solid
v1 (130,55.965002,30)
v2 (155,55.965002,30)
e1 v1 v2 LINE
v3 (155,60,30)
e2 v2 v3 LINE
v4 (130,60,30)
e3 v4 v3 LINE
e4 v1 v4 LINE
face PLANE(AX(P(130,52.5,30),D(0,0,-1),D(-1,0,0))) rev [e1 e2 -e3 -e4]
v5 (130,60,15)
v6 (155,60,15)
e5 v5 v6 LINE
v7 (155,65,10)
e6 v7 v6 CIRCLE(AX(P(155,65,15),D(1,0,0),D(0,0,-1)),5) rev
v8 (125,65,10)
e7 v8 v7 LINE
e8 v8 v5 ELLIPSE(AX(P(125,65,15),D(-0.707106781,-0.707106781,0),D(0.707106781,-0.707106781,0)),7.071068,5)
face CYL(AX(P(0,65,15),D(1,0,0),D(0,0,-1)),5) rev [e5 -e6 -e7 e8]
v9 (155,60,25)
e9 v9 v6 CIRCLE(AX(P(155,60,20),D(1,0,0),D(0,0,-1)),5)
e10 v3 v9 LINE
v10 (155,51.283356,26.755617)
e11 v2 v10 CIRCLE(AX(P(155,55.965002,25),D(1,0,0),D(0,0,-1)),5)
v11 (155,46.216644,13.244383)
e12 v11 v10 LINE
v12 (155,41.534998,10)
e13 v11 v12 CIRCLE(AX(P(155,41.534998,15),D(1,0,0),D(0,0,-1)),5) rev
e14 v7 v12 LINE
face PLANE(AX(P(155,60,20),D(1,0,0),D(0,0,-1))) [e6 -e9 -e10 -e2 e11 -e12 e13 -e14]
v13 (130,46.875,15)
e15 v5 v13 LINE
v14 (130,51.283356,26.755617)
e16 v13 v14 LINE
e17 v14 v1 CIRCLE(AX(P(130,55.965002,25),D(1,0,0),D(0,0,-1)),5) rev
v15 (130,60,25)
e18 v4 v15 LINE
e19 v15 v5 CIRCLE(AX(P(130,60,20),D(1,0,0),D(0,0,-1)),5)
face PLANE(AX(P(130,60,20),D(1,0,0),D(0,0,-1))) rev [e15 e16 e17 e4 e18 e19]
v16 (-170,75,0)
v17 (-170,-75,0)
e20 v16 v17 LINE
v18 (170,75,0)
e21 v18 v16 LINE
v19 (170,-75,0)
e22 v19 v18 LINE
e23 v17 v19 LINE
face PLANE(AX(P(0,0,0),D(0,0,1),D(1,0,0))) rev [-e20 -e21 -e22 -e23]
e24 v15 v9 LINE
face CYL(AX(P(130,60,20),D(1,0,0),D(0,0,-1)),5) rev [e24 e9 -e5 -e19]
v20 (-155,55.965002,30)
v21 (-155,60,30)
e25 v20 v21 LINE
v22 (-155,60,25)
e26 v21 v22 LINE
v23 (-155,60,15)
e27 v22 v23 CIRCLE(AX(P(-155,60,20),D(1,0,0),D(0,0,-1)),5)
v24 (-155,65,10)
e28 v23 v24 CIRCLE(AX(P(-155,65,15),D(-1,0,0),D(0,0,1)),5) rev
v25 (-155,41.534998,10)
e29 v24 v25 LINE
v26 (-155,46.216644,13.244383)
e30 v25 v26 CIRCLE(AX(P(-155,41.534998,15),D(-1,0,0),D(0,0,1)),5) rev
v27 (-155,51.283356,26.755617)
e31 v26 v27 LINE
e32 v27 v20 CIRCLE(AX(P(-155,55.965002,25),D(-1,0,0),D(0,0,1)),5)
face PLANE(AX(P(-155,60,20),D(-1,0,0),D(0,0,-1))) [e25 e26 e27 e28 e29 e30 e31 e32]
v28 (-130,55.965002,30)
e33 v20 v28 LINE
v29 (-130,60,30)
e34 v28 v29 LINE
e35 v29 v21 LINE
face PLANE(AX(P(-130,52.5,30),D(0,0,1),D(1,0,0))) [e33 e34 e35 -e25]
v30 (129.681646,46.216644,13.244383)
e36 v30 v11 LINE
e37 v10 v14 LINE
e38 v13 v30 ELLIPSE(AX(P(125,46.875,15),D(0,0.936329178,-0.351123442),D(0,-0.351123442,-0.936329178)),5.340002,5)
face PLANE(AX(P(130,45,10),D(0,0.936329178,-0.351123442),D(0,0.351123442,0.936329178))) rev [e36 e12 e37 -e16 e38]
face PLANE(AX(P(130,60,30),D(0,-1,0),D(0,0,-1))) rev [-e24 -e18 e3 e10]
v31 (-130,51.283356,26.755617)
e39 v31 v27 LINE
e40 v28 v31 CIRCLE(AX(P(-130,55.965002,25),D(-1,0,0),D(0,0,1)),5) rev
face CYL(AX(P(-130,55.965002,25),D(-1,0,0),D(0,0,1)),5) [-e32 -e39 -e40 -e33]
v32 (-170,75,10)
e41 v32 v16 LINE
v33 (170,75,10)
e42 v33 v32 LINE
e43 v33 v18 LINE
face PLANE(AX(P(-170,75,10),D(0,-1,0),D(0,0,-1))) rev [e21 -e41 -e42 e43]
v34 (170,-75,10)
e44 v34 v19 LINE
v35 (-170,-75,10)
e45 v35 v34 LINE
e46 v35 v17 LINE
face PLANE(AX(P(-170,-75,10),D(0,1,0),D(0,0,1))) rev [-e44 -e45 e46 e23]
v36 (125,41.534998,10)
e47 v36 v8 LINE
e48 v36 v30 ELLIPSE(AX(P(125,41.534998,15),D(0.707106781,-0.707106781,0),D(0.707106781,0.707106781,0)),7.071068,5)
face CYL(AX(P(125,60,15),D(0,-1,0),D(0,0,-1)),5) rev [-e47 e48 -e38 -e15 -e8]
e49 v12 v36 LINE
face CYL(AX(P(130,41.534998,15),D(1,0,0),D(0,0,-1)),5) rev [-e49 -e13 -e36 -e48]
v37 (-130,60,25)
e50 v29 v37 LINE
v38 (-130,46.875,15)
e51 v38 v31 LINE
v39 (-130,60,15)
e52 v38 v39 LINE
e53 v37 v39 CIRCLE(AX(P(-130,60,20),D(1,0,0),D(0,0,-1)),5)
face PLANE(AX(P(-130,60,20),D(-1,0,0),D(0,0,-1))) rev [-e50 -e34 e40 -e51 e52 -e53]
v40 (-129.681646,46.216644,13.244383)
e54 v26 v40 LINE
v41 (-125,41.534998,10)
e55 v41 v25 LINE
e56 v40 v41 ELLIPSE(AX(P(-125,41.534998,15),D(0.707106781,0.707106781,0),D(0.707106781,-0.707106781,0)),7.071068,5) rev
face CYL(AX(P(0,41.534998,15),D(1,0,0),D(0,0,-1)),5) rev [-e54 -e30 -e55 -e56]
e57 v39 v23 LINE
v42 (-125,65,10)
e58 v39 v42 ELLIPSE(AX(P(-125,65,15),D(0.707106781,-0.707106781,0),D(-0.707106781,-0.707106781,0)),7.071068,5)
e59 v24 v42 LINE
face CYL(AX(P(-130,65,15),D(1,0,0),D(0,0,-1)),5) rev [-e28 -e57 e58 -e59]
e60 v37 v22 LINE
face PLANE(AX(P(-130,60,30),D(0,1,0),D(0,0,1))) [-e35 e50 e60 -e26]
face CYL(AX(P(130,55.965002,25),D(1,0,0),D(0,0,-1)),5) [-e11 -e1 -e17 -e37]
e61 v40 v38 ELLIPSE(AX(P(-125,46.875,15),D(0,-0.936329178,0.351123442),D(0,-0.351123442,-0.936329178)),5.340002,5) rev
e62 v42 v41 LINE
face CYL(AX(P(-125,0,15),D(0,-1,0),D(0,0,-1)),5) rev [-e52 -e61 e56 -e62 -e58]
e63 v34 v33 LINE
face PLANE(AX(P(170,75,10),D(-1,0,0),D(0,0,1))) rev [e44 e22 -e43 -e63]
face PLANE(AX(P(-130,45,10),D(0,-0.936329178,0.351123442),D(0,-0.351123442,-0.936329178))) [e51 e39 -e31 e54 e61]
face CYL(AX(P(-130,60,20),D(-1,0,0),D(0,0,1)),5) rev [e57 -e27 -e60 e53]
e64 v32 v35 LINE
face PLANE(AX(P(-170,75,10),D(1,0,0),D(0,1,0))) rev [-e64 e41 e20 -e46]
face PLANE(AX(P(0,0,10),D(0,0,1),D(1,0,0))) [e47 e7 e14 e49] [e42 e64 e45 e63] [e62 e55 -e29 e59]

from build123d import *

# Parameters (mm, degrees)
SKETCH1_W                 = 340
SKETCH1_H                 = 150
VERTICAL_PORTION_DEPTH    = 10
SHAFT_ADAPTER_RIGHT_DEPTH = 25
SHAFT_ADAPTER_FILLETS_R   = 5


with BuildPart() as part:
    # Sketch1 → Vertical portion (new body)
    with BuildSketch(Plane.XY):
        Rectangle(SKETCH1_W, SKETCH1_H)
    extrude(amount=VERTICAL_PORTION_DEPTH)

    # Sketch4 → Shaft adapter right (add)
    with BuildSketch(Plane(origin=(155, 0, 0), x_dir=(0, 0, -1), z_dir=(1, 0, 0))):
        with BuildLine():
            Line((-10, 45), (-30, 52.5))
            Line((-30, 52.5), (-30, 60))
            Line((-30, 60), (-25, 60))
            ThreePointArc((-25, 60), (-20, 55), (-15, 60))
            Line((-15, 60), (-10, 60))
            Line((-10, 60), (-10, 55))
            Line((-10, 55), (-10, 45))
        make_face()
    shaft_adapter_right = extrude(amount=-SHAFT_ADAPTER_RIGHT_DEPTH)

    # Shaft adapter left: Shaft adapter right across plane
    add(shaft_adapter_right.mirror(Plane(origin=(0, 0, 0), x_dir=(0, 0, 1), z_dir=(1, 0, 0))))

    # Shaft adapter fillets
    shaft_adapter_fillets_edges = [part.edges().sort_by_distance(p)[0] for p in [
        (-142.5, 52.5, 30),
        (142.5, 52.5, 30),
        (130, 52.5, 10),
        (-130, 52.5, 10),
        (-142.5, 45, 10),
        (142.5, 45, 10),
        (142.5, 60, 10),
        (-142.5, 60, 10),
    ]]
    fillet(shaft_adapter_fillets_edges, radius=SHAFT_ADAPTER_FILLETS_R - 0.0001)  # a hair under: the kernel refuses the full size


solid = part.part
